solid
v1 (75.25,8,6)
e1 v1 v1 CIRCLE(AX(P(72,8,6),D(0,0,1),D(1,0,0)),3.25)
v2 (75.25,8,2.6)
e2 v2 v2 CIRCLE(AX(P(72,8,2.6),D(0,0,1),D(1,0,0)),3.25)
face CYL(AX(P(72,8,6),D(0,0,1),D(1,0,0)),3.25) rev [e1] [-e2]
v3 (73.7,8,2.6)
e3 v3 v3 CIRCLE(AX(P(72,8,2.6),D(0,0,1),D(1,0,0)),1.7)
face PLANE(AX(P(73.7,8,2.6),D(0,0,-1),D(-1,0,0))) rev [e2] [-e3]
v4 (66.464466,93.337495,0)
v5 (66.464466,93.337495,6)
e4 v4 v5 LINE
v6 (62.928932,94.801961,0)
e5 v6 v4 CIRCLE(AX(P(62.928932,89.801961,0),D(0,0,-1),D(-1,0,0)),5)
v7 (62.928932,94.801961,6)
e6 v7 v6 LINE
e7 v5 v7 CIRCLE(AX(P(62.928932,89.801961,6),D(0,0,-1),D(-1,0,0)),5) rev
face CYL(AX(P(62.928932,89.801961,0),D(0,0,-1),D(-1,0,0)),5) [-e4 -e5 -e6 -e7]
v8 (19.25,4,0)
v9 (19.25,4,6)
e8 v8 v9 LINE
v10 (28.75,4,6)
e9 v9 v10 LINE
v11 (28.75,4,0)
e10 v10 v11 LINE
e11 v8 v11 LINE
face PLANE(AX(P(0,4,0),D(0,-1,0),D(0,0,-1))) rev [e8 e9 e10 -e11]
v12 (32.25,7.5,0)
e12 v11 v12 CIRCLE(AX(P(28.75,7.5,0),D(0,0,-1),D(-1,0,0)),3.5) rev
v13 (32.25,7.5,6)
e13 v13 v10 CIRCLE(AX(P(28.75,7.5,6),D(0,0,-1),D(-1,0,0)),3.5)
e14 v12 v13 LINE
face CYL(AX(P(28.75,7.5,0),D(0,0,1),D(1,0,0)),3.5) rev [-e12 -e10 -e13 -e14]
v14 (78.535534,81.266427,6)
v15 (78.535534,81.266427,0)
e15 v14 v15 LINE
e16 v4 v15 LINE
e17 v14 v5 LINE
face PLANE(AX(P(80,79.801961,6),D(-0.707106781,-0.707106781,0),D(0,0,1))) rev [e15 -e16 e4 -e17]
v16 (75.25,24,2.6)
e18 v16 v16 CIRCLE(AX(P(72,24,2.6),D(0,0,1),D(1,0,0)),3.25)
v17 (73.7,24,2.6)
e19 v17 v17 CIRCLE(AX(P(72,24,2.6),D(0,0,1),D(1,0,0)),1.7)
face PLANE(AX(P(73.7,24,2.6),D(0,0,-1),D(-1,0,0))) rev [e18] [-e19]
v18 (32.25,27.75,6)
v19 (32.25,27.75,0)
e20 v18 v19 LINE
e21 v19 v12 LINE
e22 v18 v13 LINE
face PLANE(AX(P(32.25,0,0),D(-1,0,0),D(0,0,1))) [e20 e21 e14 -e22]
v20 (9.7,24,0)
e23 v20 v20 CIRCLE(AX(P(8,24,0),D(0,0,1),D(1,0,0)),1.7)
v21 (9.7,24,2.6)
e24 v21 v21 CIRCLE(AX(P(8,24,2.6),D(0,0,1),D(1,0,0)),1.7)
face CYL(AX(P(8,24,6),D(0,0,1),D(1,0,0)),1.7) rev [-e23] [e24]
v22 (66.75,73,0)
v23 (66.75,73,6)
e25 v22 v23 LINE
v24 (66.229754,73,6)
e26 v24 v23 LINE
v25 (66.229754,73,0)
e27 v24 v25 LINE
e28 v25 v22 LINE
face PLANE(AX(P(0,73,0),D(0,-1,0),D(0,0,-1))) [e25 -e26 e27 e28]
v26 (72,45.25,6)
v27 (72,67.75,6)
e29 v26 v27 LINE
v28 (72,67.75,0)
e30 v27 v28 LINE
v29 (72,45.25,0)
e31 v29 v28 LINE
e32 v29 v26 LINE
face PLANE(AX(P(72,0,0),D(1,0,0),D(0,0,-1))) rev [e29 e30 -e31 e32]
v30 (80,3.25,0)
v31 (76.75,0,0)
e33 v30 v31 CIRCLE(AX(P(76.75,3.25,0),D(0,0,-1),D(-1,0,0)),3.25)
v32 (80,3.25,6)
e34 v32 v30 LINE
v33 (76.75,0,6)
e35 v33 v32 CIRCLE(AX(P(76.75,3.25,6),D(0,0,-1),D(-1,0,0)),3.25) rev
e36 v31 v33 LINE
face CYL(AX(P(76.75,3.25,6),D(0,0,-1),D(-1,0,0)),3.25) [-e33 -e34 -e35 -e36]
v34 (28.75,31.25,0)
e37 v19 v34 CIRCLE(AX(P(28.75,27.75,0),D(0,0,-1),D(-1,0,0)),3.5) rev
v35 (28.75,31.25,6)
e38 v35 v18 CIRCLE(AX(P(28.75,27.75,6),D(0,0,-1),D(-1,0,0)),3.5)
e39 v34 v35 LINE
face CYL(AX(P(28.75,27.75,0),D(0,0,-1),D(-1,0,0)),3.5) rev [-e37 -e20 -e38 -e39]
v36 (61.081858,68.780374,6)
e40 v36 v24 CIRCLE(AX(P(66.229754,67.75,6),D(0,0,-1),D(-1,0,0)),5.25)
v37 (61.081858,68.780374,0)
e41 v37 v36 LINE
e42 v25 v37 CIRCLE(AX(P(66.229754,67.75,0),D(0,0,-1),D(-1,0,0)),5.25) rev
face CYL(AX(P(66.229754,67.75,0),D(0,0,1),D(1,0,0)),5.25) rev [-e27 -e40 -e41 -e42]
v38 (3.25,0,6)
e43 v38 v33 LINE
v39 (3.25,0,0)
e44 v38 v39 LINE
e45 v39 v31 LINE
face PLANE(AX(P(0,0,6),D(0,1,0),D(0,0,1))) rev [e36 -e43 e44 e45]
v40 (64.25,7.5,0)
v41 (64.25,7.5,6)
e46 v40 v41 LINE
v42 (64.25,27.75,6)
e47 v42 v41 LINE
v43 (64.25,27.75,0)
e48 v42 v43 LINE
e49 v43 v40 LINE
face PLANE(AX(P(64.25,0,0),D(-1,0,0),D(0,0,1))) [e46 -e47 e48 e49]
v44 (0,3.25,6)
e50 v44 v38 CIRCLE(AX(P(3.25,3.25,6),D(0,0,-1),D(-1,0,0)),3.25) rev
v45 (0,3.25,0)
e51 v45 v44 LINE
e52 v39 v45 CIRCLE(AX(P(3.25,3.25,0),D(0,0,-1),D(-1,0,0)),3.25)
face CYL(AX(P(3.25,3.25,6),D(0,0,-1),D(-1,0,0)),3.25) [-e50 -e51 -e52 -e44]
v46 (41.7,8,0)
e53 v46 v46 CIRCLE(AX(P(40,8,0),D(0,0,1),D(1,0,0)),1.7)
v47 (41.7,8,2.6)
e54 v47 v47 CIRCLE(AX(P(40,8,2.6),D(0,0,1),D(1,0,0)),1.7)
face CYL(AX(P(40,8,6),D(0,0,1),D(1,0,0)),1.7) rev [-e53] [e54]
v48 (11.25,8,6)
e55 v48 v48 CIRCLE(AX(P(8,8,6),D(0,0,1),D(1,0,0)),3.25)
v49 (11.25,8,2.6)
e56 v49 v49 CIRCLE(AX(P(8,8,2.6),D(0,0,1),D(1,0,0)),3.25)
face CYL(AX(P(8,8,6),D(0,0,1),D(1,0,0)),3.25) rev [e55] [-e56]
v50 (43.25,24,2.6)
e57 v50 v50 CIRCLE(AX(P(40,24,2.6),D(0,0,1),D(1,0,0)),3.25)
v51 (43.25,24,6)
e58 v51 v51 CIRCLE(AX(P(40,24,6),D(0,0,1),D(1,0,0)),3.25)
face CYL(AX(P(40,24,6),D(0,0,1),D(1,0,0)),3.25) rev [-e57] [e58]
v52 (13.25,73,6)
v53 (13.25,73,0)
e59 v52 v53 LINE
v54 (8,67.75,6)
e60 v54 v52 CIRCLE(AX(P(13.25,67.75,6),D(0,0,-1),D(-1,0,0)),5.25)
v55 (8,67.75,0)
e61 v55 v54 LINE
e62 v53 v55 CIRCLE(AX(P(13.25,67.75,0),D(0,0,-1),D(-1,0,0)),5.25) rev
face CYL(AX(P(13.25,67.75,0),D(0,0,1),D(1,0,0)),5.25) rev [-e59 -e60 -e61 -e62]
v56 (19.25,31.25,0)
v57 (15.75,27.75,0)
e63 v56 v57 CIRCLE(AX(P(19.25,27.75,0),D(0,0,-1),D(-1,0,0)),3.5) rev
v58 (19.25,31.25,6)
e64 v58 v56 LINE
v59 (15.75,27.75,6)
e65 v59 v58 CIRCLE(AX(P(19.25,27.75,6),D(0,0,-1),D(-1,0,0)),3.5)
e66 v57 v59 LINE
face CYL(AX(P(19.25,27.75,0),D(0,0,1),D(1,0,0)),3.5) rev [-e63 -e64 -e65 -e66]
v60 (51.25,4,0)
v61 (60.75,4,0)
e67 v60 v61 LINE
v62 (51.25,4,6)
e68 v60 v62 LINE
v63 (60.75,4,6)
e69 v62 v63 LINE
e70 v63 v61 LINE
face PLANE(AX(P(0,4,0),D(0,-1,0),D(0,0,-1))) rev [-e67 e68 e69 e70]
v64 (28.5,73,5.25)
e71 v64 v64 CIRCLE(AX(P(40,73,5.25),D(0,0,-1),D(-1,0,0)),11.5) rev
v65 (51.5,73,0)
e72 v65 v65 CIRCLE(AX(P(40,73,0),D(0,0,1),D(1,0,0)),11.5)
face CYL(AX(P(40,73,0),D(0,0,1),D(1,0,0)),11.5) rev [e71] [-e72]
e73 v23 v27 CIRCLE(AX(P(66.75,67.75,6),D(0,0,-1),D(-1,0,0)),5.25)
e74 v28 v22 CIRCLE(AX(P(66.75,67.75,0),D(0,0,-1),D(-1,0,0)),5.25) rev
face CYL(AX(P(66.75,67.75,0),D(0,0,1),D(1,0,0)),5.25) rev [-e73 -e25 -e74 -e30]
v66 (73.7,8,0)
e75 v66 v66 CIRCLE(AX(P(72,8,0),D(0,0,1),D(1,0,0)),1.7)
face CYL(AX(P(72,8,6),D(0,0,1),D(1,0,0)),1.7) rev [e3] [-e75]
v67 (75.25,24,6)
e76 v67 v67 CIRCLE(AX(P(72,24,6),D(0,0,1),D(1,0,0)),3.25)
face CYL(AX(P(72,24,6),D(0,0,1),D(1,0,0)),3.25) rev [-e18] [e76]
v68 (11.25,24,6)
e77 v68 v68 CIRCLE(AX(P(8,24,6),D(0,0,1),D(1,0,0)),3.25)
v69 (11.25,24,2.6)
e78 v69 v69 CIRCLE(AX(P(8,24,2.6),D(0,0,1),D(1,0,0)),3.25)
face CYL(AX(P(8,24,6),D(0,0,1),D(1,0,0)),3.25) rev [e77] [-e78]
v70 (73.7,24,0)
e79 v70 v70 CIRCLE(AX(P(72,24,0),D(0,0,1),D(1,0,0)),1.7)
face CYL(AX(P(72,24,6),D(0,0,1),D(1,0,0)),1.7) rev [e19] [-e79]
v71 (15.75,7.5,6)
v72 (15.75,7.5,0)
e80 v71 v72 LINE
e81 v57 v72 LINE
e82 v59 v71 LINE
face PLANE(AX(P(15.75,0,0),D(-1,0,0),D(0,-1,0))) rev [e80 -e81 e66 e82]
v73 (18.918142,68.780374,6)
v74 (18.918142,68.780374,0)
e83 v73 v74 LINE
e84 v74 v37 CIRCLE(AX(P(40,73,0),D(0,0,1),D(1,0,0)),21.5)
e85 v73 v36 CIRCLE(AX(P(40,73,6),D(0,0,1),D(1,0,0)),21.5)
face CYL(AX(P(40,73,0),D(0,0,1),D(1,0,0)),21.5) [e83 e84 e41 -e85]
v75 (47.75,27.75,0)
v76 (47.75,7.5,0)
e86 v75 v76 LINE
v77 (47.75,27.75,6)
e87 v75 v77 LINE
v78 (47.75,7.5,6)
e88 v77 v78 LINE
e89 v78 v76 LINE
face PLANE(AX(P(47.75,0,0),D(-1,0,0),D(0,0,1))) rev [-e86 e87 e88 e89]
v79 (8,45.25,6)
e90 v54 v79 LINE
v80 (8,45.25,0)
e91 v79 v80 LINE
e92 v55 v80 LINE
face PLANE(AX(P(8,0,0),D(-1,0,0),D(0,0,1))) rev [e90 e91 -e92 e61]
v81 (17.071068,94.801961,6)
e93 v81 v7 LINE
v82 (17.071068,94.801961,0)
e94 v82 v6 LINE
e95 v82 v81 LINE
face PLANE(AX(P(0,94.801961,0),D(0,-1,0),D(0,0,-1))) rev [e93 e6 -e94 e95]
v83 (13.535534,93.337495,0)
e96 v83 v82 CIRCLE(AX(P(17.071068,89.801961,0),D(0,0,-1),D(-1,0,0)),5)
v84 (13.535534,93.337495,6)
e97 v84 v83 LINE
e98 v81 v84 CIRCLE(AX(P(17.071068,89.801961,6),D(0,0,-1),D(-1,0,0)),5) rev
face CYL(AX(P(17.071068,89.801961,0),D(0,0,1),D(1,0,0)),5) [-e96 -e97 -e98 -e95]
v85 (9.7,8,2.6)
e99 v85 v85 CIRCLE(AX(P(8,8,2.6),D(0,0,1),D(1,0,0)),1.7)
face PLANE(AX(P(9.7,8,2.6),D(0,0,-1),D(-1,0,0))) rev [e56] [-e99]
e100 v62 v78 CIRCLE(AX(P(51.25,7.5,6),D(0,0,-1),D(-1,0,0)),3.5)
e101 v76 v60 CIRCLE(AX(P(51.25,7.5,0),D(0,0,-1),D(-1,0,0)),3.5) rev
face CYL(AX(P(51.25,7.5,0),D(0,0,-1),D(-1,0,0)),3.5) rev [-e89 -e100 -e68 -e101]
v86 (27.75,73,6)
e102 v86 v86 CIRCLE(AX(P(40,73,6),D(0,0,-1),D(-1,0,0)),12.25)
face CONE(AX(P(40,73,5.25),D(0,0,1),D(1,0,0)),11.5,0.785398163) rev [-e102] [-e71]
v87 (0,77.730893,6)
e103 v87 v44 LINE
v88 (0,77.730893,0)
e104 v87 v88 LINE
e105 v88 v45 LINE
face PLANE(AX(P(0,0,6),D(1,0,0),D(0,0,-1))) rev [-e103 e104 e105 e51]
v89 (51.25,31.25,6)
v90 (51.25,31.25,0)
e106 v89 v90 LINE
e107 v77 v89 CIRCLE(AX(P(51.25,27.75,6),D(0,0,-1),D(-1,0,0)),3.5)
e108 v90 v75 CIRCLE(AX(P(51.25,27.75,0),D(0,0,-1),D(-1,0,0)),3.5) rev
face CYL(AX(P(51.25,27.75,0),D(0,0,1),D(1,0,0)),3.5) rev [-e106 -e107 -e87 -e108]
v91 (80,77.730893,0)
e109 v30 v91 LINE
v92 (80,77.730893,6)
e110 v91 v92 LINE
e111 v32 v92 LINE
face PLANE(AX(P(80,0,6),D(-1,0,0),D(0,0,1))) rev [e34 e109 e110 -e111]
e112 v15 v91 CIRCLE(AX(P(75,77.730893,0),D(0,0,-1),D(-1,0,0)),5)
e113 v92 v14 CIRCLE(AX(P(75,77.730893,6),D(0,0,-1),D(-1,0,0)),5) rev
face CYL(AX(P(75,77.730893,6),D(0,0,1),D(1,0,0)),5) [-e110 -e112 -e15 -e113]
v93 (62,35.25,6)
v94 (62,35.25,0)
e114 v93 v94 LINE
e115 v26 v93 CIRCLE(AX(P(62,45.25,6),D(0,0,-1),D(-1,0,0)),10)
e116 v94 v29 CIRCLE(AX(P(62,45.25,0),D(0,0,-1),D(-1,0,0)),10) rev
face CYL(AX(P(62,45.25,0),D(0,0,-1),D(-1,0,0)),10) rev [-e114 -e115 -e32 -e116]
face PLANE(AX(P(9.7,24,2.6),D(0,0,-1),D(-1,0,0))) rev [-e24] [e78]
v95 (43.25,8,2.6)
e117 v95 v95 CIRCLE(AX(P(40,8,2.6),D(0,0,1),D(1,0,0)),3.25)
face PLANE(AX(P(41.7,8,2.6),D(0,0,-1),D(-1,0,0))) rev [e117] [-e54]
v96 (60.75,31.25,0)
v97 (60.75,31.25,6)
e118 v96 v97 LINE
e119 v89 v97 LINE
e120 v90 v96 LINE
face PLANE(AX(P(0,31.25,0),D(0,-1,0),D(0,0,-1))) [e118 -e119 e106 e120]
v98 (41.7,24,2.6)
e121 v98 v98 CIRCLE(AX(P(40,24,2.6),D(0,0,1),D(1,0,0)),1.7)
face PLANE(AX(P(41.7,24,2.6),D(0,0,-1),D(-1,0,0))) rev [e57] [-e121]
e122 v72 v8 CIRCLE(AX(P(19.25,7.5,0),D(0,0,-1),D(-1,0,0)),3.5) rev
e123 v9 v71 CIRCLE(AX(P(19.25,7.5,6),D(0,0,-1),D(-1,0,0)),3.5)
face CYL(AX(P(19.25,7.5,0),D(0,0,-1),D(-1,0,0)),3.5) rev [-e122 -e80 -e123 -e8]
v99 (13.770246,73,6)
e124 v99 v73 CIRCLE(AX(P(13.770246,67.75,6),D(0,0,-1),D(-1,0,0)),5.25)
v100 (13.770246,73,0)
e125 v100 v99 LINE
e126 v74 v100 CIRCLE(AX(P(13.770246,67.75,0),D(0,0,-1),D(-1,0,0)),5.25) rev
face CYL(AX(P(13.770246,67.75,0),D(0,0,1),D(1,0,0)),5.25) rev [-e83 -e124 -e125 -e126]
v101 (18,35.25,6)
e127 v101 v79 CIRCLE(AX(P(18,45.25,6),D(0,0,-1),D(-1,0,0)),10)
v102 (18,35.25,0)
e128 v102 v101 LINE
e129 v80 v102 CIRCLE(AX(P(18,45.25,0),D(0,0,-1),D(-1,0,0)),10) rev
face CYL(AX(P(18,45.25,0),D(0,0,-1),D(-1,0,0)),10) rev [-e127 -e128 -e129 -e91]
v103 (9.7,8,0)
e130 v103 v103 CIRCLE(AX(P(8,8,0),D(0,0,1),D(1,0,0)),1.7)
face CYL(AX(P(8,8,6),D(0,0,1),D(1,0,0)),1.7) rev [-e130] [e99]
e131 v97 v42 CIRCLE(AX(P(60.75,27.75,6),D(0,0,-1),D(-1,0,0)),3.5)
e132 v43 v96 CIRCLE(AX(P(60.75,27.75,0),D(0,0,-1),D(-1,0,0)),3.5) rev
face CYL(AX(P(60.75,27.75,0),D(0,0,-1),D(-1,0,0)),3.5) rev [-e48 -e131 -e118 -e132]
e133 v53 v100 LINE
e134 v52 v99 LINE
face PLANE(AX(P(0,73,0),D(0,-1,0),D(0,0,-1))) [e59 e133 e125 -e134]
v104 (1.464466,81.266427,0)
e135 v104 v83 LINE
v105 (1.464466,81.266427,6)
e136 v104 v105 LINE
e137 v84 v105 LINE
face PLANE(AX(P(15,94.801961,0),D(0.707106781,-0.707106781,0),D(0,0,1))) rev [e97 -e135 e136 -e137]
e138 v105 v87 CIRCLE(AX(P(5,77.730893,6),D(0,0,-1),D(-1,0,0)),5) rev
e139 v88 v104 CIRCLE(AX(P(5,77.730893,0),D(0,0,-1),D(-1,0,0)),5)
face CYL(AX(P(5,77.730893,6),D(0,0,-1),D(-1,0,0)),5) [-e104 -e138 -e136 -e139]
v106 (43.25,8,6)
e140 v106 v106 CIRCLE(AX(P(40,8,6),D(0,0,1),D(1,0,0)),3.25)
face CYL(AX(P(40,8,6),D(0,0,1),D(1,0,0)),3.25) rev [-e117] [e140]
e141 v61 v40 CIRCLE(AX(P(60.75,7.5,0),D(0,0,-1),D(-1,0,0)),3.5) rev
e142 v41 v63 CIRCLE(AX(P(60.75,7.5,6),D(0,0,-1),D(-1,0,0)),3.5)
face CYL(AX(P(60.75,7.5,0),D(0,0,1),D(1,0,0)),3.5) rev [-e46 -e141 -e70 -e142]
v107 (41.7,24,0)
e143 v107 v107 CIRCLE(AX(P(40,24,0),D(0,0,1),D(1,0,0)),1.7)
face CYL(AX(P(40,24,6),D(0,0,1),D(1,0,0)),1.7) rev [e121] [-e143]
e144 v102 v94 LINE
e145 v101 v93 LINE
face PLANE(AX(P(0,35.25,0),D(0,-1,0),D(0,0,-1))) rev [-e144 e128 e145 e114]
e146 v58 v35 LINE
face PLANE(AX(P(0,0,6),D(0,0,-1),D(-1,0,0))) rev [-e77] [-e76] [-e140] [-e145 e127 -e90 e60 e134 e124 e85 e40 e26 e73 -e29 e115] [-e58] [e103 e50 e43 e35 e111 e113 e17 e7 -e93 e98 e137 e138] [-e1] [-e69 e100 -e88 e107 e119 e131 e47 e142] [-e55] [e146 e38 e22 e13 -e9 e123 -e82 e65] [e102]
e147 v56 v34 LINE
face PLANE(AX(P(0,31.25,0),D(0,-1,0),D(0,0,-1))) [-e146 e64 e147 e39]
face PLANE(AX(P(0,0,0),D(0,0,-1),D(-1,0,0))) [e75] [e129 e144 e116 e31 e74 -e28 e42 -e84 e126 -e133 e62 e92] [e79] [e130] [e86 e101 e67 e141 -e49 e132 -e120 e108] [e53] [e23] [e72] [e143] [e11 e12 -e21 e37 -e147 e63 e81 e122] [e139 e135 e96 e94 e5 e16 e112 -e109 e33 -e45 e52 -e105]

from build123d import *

# Parameters (mm, degrees)
SKETCH1_W                                           = 80
SKETCH1_H                                           = 115
BOSS_EXTRUDE1_DEPTH                                 = 6
CBORE_FOR_M3_HEX_SOCKET_HEAD_CAP_SCREW1_D           = 3.4
CBORE_FOR_M3_HEX_SOCKET_HEAD_CAP_SCREW1_CBORE_D     = 6.5
CBORE_FOR_M3_HEX_SOCKET_HEAD_CAP_SCREW1_CBORE_DEPTH = 3.4
SKETCH4_R                                           = 11.5
CUT_EXTRUDE1_DEPTH                                  = 141.2176879
CHAMFER1_SIZE                                       = 0.75
CHAMFER2_SIZE                                       = 6
CBORE_START                                         = 2.6
CBORE_FOR_M3_HEX_SOCKET_HEAD_CAP_SCR_2_R            = 3.25
CBORE_FOR_M3_HEX_SOCKET_HEAD_CAP_SCREW2_DEPTH       = 3.4
CBORE_FOR_M3_HEX_SOCKET_HEAD_CAP_SCR_3_O_R          = 1.7
CBORE_FOR_M3_HEX_SOCKET_HEAD_CAP_SCR_3_DEPTH        = 2.6
CUT_EXTRUDE2_DEPTH                                  = 141.2176879
FILLET1_R                                           = 3.25
CUT_EXTRUDE3_DEPTH                                  = 141.2176879
FILLET2_R                                           = 10
FILLET4_R                                           = 5.25
SKETCH10_W                                          = 16.5
SKETCH10_H                                          = 27.25
CUT_EXTRUDE4_DEPTH                                  = 141.2176879
FILLET5_R                                           = 3.5
SKETCH11_W                                          = 80
SKETCH11_H                                          = 20.198039027
CUT_EXTRUDE5_DEPTH                                  = 141.2176879
CHAMFER3_SIZE                                       = 15
FILLET6_R                                           = 5


# Read off the part's stored shape, not the designer's step: CBORE for M3 Hex Socket Head Cap Screw2
with BuildPart() as part:
    # Sketch1 → Boss-Extrude1 (new body)
    with BuildSketch(Plane.XY):
        with Locations((40, 57.5)):
            Rectangle(SKETCH1_W, SKETCH1_H)
    extrude(amount=BOSS_EXTRUDE1_DEPTH)

    # CBORE for M3 Hex Socket Head Cap Screw1 (through all)
    with Locations(Plane.XY.offset(6)):
        with Locations((8, 8), (40, 8), (72, 8), (40, 24), (72, 24), (8, 24)):
            CounterBoreHole(CBORE_FOR_M3_HEX_SOCKET_HEAD_CAP_SCREW1_D / 2, CBORE_FOR_M3_HEX_SOCKET_HEAD_CAP_SCREW1_CBORE_D / 2, CBORE_FOR_M3_HEX_SOCKET_HEAD_CAP_SCREW1_CBORE_DEPTH)

    # Sketch4 → Cut-Extrude1 (cut, through all)
    with BuildSketch(Plane.XY.offset(6)):
        with Locations((40, 73)):
            Circle(SKETCH4_R)
    extrude(amount=-CUT_EXTRUDE1_DEPTH, mode=Mode.SUBTRACT)

    # Chamfer1
    chamfer1_edges = [part.edges().sort_by_distance(p)[0] for p in [
        (28.5, 73, 6),
    ]]
    chamfer(chamfer1_edges, length=CHAMFER1_SIZE)

    # Chamfer2
    chamfer2_edges = [part.edges().sort_by_distance(p)[0] for p in [
        (0, 115, 3),
        (80, 115, 3),
    ]]
    chamfer(chamfer2_edges, length=CHAMFER2_SIZE)

    # CBORE for M3 Hex Socket Head Cap Scr 2 → CBORE for M3 Hex Socket Head Cap Screw2 (cut)
    with BuildSketch(Plane.XY.offset(CBORE_START)):
        with Locations((8, 105)):
            Circle(CBORE_FOR_M3_HEX_SOCKET_HEAD_CAP_SCR_2_R)
        with Locations((72, 105)):
            Circle(CBORE_FOR_M3_HEX_SOCKET_HEAD_CAP_SCR_2_R)
    extrude(amount=CBORE_FOR_M3_HEX_SOCKET_HEAD_CAP_SCREW2_DEPTH, mode=Mode.SUBTRACT)

    # CBORE for M3 Hex Socket Head Cap Scr 3 o → CBORE for M3 Hex Socket Head Cap Scr 3 (cut)
    with BuildSketch(Plane.XY):
        with Locations((8, 105)):
            Circle(CBORE_FOR_M3_HEX_SOCKET_HEAD_CAP_SCR_3_O_R)
        with Locations((72, 105)):
            Circle(CBORE_FOR_M3_HEX_SOCKET_HEAD_CAP_SCR_3_O_R)
    extrude(amount=CBORE_FOR_M3_HEX_SOCKET_HEAD_CAP_SCR_3_DEPTH, mode=Mode.SUBTRACT)

    # Sketch8 → Cut-Extrude2 (cut, through all)
    with BuildSketch(Plane.XY.offset(6)):
        Polygon((18.198039027, 105), (18.198039027, 94.801960973), (40, 94.801960973), (61.801960973, 94.801960973), (61.801960973, 105), (61.801960973, 115), (18.198039027, 115), align=None)
    extrude(amount=-CUT_EXTRUDE2_DEPTH, mode=Mode.SUBTRACT)

    # Fillet1
    fillet1_edges = [part.edges().sort_by_distance(p)[0] for p in [
        (61.801960973, 115, 3),
        (61.801960973, 94.801960973, 3),
        (18.198039027, 94.801960973, 3),
        (18.198039027, 115, 3),
        (0, 109, 3),
        (74, 115, 3),
        (6, 115, 3),
        (80, 109, 3),
        (80, 0, 3),
        (0, 0, 3),
    ]]
    fillet(fillet1_edges, radius=FILLET1_R)

    # Sketch9 → Cut-Extrude3 (cut, through all)
    with BuildSketch(Plane.XY.offset(6)):
        with BuildLine():
            Line((8, 73), (8, 35.25))
            Line((8, 35.25), (40, 35.25))
            Line((40, 35.25), (72, 35.25))
            Line((72, 35.25), (72, 73))
            Line((72, 73), (61.5, 73))
            ThreePointArc((61.5, 73), (40, 51.5), (18.5, 73))
            Line((18.5, 73), (8, 73))
        make_face()
    extrude(amount=-CUT_EXTRUDE3_DEPTH, mode=Mode.SUBTRACT)

    # Fillet2
    fillet2_edges = [part.edges().sort_by_distance(p)[0] for p in [
        (72, 35.25, 3),
        (8, 35.25, 3),
    ]]
    fillet(fillet2_edges, radius=FILLET2_R)

    # Fillet4
    fillet4_edges = [part.edges().sort_by_distance(p)[0] for p in [
        (18.5, 73, 3),
        (61.5, 73, 3),
        (72, 73, 3),
        (8, 73, 3),
    ]]
    fillet(fillet4_edges, radius=FILLET4_R)

    # Sketch10 → Cut-Extrude4 (cut, through all)
    with BuildSketch(Plane.XY.offset(6)):
        with Locations((24, 17.625)):
            Rectangle(SKETCH10_W, SKETCH10_H)
        with Locations((56, 17.625)):
            Rectangle(SKETCH10_W, SKETCH10_H)
    extrude(amount=-CUT_EXTRUDE4_DEPTH, mode=Mode.SUBTRACT)

    # Fillet5
    fillet5_edges = [part.edges().sort_by_distance(p)[0] for p in [
        (15.75, 31.25, 3),
        (32.25, 31.25, 3),
        (32.25, 4, 3),
        (15.75, 4, 3),
        (47.75, 31.25, 3),
        (64.25, 31.25, 3),
        (64.25, 4, 3),
        (47.75, 4, 3),
    ]]
    fillet(fillet5_edges, radius=FILLET5_R)

    # Sketch11 → Cut-Extrude5 (cut, through all)
    with BuildSketch(Plane.XY.offset(6)):
        with Locations((40, 104.900980487)):
            Rectangle(SKETCH11_W, SKETCH11_H)
    extrude(amount=-CUT_EXTRUDE5_DEPTH, mode=Mode.SUBTRACT)

    # Chamfer3
    chamfer3_edges = [part.edges().sort_by_distance(p)[0] for p in [
        (80, 94.801960973, 3),
        (0, 94.801960973, 3),
    ]]
    chamfer(chamfer3_edges, length=CHAMFER3_SIZE)

    # Fillet6
    fillet6_edges = [part.edges().sort_by_distance(p)[0] for p in [
        (80, 79.801960973, 3),
        (15, 94.801960973, 3),
        (65, 94.801960973, 3),
        (0, 79.801960973, 3),
    ]]
    fillet(fillet6_edges, radius=FILLET6_R)


solid = part.part
